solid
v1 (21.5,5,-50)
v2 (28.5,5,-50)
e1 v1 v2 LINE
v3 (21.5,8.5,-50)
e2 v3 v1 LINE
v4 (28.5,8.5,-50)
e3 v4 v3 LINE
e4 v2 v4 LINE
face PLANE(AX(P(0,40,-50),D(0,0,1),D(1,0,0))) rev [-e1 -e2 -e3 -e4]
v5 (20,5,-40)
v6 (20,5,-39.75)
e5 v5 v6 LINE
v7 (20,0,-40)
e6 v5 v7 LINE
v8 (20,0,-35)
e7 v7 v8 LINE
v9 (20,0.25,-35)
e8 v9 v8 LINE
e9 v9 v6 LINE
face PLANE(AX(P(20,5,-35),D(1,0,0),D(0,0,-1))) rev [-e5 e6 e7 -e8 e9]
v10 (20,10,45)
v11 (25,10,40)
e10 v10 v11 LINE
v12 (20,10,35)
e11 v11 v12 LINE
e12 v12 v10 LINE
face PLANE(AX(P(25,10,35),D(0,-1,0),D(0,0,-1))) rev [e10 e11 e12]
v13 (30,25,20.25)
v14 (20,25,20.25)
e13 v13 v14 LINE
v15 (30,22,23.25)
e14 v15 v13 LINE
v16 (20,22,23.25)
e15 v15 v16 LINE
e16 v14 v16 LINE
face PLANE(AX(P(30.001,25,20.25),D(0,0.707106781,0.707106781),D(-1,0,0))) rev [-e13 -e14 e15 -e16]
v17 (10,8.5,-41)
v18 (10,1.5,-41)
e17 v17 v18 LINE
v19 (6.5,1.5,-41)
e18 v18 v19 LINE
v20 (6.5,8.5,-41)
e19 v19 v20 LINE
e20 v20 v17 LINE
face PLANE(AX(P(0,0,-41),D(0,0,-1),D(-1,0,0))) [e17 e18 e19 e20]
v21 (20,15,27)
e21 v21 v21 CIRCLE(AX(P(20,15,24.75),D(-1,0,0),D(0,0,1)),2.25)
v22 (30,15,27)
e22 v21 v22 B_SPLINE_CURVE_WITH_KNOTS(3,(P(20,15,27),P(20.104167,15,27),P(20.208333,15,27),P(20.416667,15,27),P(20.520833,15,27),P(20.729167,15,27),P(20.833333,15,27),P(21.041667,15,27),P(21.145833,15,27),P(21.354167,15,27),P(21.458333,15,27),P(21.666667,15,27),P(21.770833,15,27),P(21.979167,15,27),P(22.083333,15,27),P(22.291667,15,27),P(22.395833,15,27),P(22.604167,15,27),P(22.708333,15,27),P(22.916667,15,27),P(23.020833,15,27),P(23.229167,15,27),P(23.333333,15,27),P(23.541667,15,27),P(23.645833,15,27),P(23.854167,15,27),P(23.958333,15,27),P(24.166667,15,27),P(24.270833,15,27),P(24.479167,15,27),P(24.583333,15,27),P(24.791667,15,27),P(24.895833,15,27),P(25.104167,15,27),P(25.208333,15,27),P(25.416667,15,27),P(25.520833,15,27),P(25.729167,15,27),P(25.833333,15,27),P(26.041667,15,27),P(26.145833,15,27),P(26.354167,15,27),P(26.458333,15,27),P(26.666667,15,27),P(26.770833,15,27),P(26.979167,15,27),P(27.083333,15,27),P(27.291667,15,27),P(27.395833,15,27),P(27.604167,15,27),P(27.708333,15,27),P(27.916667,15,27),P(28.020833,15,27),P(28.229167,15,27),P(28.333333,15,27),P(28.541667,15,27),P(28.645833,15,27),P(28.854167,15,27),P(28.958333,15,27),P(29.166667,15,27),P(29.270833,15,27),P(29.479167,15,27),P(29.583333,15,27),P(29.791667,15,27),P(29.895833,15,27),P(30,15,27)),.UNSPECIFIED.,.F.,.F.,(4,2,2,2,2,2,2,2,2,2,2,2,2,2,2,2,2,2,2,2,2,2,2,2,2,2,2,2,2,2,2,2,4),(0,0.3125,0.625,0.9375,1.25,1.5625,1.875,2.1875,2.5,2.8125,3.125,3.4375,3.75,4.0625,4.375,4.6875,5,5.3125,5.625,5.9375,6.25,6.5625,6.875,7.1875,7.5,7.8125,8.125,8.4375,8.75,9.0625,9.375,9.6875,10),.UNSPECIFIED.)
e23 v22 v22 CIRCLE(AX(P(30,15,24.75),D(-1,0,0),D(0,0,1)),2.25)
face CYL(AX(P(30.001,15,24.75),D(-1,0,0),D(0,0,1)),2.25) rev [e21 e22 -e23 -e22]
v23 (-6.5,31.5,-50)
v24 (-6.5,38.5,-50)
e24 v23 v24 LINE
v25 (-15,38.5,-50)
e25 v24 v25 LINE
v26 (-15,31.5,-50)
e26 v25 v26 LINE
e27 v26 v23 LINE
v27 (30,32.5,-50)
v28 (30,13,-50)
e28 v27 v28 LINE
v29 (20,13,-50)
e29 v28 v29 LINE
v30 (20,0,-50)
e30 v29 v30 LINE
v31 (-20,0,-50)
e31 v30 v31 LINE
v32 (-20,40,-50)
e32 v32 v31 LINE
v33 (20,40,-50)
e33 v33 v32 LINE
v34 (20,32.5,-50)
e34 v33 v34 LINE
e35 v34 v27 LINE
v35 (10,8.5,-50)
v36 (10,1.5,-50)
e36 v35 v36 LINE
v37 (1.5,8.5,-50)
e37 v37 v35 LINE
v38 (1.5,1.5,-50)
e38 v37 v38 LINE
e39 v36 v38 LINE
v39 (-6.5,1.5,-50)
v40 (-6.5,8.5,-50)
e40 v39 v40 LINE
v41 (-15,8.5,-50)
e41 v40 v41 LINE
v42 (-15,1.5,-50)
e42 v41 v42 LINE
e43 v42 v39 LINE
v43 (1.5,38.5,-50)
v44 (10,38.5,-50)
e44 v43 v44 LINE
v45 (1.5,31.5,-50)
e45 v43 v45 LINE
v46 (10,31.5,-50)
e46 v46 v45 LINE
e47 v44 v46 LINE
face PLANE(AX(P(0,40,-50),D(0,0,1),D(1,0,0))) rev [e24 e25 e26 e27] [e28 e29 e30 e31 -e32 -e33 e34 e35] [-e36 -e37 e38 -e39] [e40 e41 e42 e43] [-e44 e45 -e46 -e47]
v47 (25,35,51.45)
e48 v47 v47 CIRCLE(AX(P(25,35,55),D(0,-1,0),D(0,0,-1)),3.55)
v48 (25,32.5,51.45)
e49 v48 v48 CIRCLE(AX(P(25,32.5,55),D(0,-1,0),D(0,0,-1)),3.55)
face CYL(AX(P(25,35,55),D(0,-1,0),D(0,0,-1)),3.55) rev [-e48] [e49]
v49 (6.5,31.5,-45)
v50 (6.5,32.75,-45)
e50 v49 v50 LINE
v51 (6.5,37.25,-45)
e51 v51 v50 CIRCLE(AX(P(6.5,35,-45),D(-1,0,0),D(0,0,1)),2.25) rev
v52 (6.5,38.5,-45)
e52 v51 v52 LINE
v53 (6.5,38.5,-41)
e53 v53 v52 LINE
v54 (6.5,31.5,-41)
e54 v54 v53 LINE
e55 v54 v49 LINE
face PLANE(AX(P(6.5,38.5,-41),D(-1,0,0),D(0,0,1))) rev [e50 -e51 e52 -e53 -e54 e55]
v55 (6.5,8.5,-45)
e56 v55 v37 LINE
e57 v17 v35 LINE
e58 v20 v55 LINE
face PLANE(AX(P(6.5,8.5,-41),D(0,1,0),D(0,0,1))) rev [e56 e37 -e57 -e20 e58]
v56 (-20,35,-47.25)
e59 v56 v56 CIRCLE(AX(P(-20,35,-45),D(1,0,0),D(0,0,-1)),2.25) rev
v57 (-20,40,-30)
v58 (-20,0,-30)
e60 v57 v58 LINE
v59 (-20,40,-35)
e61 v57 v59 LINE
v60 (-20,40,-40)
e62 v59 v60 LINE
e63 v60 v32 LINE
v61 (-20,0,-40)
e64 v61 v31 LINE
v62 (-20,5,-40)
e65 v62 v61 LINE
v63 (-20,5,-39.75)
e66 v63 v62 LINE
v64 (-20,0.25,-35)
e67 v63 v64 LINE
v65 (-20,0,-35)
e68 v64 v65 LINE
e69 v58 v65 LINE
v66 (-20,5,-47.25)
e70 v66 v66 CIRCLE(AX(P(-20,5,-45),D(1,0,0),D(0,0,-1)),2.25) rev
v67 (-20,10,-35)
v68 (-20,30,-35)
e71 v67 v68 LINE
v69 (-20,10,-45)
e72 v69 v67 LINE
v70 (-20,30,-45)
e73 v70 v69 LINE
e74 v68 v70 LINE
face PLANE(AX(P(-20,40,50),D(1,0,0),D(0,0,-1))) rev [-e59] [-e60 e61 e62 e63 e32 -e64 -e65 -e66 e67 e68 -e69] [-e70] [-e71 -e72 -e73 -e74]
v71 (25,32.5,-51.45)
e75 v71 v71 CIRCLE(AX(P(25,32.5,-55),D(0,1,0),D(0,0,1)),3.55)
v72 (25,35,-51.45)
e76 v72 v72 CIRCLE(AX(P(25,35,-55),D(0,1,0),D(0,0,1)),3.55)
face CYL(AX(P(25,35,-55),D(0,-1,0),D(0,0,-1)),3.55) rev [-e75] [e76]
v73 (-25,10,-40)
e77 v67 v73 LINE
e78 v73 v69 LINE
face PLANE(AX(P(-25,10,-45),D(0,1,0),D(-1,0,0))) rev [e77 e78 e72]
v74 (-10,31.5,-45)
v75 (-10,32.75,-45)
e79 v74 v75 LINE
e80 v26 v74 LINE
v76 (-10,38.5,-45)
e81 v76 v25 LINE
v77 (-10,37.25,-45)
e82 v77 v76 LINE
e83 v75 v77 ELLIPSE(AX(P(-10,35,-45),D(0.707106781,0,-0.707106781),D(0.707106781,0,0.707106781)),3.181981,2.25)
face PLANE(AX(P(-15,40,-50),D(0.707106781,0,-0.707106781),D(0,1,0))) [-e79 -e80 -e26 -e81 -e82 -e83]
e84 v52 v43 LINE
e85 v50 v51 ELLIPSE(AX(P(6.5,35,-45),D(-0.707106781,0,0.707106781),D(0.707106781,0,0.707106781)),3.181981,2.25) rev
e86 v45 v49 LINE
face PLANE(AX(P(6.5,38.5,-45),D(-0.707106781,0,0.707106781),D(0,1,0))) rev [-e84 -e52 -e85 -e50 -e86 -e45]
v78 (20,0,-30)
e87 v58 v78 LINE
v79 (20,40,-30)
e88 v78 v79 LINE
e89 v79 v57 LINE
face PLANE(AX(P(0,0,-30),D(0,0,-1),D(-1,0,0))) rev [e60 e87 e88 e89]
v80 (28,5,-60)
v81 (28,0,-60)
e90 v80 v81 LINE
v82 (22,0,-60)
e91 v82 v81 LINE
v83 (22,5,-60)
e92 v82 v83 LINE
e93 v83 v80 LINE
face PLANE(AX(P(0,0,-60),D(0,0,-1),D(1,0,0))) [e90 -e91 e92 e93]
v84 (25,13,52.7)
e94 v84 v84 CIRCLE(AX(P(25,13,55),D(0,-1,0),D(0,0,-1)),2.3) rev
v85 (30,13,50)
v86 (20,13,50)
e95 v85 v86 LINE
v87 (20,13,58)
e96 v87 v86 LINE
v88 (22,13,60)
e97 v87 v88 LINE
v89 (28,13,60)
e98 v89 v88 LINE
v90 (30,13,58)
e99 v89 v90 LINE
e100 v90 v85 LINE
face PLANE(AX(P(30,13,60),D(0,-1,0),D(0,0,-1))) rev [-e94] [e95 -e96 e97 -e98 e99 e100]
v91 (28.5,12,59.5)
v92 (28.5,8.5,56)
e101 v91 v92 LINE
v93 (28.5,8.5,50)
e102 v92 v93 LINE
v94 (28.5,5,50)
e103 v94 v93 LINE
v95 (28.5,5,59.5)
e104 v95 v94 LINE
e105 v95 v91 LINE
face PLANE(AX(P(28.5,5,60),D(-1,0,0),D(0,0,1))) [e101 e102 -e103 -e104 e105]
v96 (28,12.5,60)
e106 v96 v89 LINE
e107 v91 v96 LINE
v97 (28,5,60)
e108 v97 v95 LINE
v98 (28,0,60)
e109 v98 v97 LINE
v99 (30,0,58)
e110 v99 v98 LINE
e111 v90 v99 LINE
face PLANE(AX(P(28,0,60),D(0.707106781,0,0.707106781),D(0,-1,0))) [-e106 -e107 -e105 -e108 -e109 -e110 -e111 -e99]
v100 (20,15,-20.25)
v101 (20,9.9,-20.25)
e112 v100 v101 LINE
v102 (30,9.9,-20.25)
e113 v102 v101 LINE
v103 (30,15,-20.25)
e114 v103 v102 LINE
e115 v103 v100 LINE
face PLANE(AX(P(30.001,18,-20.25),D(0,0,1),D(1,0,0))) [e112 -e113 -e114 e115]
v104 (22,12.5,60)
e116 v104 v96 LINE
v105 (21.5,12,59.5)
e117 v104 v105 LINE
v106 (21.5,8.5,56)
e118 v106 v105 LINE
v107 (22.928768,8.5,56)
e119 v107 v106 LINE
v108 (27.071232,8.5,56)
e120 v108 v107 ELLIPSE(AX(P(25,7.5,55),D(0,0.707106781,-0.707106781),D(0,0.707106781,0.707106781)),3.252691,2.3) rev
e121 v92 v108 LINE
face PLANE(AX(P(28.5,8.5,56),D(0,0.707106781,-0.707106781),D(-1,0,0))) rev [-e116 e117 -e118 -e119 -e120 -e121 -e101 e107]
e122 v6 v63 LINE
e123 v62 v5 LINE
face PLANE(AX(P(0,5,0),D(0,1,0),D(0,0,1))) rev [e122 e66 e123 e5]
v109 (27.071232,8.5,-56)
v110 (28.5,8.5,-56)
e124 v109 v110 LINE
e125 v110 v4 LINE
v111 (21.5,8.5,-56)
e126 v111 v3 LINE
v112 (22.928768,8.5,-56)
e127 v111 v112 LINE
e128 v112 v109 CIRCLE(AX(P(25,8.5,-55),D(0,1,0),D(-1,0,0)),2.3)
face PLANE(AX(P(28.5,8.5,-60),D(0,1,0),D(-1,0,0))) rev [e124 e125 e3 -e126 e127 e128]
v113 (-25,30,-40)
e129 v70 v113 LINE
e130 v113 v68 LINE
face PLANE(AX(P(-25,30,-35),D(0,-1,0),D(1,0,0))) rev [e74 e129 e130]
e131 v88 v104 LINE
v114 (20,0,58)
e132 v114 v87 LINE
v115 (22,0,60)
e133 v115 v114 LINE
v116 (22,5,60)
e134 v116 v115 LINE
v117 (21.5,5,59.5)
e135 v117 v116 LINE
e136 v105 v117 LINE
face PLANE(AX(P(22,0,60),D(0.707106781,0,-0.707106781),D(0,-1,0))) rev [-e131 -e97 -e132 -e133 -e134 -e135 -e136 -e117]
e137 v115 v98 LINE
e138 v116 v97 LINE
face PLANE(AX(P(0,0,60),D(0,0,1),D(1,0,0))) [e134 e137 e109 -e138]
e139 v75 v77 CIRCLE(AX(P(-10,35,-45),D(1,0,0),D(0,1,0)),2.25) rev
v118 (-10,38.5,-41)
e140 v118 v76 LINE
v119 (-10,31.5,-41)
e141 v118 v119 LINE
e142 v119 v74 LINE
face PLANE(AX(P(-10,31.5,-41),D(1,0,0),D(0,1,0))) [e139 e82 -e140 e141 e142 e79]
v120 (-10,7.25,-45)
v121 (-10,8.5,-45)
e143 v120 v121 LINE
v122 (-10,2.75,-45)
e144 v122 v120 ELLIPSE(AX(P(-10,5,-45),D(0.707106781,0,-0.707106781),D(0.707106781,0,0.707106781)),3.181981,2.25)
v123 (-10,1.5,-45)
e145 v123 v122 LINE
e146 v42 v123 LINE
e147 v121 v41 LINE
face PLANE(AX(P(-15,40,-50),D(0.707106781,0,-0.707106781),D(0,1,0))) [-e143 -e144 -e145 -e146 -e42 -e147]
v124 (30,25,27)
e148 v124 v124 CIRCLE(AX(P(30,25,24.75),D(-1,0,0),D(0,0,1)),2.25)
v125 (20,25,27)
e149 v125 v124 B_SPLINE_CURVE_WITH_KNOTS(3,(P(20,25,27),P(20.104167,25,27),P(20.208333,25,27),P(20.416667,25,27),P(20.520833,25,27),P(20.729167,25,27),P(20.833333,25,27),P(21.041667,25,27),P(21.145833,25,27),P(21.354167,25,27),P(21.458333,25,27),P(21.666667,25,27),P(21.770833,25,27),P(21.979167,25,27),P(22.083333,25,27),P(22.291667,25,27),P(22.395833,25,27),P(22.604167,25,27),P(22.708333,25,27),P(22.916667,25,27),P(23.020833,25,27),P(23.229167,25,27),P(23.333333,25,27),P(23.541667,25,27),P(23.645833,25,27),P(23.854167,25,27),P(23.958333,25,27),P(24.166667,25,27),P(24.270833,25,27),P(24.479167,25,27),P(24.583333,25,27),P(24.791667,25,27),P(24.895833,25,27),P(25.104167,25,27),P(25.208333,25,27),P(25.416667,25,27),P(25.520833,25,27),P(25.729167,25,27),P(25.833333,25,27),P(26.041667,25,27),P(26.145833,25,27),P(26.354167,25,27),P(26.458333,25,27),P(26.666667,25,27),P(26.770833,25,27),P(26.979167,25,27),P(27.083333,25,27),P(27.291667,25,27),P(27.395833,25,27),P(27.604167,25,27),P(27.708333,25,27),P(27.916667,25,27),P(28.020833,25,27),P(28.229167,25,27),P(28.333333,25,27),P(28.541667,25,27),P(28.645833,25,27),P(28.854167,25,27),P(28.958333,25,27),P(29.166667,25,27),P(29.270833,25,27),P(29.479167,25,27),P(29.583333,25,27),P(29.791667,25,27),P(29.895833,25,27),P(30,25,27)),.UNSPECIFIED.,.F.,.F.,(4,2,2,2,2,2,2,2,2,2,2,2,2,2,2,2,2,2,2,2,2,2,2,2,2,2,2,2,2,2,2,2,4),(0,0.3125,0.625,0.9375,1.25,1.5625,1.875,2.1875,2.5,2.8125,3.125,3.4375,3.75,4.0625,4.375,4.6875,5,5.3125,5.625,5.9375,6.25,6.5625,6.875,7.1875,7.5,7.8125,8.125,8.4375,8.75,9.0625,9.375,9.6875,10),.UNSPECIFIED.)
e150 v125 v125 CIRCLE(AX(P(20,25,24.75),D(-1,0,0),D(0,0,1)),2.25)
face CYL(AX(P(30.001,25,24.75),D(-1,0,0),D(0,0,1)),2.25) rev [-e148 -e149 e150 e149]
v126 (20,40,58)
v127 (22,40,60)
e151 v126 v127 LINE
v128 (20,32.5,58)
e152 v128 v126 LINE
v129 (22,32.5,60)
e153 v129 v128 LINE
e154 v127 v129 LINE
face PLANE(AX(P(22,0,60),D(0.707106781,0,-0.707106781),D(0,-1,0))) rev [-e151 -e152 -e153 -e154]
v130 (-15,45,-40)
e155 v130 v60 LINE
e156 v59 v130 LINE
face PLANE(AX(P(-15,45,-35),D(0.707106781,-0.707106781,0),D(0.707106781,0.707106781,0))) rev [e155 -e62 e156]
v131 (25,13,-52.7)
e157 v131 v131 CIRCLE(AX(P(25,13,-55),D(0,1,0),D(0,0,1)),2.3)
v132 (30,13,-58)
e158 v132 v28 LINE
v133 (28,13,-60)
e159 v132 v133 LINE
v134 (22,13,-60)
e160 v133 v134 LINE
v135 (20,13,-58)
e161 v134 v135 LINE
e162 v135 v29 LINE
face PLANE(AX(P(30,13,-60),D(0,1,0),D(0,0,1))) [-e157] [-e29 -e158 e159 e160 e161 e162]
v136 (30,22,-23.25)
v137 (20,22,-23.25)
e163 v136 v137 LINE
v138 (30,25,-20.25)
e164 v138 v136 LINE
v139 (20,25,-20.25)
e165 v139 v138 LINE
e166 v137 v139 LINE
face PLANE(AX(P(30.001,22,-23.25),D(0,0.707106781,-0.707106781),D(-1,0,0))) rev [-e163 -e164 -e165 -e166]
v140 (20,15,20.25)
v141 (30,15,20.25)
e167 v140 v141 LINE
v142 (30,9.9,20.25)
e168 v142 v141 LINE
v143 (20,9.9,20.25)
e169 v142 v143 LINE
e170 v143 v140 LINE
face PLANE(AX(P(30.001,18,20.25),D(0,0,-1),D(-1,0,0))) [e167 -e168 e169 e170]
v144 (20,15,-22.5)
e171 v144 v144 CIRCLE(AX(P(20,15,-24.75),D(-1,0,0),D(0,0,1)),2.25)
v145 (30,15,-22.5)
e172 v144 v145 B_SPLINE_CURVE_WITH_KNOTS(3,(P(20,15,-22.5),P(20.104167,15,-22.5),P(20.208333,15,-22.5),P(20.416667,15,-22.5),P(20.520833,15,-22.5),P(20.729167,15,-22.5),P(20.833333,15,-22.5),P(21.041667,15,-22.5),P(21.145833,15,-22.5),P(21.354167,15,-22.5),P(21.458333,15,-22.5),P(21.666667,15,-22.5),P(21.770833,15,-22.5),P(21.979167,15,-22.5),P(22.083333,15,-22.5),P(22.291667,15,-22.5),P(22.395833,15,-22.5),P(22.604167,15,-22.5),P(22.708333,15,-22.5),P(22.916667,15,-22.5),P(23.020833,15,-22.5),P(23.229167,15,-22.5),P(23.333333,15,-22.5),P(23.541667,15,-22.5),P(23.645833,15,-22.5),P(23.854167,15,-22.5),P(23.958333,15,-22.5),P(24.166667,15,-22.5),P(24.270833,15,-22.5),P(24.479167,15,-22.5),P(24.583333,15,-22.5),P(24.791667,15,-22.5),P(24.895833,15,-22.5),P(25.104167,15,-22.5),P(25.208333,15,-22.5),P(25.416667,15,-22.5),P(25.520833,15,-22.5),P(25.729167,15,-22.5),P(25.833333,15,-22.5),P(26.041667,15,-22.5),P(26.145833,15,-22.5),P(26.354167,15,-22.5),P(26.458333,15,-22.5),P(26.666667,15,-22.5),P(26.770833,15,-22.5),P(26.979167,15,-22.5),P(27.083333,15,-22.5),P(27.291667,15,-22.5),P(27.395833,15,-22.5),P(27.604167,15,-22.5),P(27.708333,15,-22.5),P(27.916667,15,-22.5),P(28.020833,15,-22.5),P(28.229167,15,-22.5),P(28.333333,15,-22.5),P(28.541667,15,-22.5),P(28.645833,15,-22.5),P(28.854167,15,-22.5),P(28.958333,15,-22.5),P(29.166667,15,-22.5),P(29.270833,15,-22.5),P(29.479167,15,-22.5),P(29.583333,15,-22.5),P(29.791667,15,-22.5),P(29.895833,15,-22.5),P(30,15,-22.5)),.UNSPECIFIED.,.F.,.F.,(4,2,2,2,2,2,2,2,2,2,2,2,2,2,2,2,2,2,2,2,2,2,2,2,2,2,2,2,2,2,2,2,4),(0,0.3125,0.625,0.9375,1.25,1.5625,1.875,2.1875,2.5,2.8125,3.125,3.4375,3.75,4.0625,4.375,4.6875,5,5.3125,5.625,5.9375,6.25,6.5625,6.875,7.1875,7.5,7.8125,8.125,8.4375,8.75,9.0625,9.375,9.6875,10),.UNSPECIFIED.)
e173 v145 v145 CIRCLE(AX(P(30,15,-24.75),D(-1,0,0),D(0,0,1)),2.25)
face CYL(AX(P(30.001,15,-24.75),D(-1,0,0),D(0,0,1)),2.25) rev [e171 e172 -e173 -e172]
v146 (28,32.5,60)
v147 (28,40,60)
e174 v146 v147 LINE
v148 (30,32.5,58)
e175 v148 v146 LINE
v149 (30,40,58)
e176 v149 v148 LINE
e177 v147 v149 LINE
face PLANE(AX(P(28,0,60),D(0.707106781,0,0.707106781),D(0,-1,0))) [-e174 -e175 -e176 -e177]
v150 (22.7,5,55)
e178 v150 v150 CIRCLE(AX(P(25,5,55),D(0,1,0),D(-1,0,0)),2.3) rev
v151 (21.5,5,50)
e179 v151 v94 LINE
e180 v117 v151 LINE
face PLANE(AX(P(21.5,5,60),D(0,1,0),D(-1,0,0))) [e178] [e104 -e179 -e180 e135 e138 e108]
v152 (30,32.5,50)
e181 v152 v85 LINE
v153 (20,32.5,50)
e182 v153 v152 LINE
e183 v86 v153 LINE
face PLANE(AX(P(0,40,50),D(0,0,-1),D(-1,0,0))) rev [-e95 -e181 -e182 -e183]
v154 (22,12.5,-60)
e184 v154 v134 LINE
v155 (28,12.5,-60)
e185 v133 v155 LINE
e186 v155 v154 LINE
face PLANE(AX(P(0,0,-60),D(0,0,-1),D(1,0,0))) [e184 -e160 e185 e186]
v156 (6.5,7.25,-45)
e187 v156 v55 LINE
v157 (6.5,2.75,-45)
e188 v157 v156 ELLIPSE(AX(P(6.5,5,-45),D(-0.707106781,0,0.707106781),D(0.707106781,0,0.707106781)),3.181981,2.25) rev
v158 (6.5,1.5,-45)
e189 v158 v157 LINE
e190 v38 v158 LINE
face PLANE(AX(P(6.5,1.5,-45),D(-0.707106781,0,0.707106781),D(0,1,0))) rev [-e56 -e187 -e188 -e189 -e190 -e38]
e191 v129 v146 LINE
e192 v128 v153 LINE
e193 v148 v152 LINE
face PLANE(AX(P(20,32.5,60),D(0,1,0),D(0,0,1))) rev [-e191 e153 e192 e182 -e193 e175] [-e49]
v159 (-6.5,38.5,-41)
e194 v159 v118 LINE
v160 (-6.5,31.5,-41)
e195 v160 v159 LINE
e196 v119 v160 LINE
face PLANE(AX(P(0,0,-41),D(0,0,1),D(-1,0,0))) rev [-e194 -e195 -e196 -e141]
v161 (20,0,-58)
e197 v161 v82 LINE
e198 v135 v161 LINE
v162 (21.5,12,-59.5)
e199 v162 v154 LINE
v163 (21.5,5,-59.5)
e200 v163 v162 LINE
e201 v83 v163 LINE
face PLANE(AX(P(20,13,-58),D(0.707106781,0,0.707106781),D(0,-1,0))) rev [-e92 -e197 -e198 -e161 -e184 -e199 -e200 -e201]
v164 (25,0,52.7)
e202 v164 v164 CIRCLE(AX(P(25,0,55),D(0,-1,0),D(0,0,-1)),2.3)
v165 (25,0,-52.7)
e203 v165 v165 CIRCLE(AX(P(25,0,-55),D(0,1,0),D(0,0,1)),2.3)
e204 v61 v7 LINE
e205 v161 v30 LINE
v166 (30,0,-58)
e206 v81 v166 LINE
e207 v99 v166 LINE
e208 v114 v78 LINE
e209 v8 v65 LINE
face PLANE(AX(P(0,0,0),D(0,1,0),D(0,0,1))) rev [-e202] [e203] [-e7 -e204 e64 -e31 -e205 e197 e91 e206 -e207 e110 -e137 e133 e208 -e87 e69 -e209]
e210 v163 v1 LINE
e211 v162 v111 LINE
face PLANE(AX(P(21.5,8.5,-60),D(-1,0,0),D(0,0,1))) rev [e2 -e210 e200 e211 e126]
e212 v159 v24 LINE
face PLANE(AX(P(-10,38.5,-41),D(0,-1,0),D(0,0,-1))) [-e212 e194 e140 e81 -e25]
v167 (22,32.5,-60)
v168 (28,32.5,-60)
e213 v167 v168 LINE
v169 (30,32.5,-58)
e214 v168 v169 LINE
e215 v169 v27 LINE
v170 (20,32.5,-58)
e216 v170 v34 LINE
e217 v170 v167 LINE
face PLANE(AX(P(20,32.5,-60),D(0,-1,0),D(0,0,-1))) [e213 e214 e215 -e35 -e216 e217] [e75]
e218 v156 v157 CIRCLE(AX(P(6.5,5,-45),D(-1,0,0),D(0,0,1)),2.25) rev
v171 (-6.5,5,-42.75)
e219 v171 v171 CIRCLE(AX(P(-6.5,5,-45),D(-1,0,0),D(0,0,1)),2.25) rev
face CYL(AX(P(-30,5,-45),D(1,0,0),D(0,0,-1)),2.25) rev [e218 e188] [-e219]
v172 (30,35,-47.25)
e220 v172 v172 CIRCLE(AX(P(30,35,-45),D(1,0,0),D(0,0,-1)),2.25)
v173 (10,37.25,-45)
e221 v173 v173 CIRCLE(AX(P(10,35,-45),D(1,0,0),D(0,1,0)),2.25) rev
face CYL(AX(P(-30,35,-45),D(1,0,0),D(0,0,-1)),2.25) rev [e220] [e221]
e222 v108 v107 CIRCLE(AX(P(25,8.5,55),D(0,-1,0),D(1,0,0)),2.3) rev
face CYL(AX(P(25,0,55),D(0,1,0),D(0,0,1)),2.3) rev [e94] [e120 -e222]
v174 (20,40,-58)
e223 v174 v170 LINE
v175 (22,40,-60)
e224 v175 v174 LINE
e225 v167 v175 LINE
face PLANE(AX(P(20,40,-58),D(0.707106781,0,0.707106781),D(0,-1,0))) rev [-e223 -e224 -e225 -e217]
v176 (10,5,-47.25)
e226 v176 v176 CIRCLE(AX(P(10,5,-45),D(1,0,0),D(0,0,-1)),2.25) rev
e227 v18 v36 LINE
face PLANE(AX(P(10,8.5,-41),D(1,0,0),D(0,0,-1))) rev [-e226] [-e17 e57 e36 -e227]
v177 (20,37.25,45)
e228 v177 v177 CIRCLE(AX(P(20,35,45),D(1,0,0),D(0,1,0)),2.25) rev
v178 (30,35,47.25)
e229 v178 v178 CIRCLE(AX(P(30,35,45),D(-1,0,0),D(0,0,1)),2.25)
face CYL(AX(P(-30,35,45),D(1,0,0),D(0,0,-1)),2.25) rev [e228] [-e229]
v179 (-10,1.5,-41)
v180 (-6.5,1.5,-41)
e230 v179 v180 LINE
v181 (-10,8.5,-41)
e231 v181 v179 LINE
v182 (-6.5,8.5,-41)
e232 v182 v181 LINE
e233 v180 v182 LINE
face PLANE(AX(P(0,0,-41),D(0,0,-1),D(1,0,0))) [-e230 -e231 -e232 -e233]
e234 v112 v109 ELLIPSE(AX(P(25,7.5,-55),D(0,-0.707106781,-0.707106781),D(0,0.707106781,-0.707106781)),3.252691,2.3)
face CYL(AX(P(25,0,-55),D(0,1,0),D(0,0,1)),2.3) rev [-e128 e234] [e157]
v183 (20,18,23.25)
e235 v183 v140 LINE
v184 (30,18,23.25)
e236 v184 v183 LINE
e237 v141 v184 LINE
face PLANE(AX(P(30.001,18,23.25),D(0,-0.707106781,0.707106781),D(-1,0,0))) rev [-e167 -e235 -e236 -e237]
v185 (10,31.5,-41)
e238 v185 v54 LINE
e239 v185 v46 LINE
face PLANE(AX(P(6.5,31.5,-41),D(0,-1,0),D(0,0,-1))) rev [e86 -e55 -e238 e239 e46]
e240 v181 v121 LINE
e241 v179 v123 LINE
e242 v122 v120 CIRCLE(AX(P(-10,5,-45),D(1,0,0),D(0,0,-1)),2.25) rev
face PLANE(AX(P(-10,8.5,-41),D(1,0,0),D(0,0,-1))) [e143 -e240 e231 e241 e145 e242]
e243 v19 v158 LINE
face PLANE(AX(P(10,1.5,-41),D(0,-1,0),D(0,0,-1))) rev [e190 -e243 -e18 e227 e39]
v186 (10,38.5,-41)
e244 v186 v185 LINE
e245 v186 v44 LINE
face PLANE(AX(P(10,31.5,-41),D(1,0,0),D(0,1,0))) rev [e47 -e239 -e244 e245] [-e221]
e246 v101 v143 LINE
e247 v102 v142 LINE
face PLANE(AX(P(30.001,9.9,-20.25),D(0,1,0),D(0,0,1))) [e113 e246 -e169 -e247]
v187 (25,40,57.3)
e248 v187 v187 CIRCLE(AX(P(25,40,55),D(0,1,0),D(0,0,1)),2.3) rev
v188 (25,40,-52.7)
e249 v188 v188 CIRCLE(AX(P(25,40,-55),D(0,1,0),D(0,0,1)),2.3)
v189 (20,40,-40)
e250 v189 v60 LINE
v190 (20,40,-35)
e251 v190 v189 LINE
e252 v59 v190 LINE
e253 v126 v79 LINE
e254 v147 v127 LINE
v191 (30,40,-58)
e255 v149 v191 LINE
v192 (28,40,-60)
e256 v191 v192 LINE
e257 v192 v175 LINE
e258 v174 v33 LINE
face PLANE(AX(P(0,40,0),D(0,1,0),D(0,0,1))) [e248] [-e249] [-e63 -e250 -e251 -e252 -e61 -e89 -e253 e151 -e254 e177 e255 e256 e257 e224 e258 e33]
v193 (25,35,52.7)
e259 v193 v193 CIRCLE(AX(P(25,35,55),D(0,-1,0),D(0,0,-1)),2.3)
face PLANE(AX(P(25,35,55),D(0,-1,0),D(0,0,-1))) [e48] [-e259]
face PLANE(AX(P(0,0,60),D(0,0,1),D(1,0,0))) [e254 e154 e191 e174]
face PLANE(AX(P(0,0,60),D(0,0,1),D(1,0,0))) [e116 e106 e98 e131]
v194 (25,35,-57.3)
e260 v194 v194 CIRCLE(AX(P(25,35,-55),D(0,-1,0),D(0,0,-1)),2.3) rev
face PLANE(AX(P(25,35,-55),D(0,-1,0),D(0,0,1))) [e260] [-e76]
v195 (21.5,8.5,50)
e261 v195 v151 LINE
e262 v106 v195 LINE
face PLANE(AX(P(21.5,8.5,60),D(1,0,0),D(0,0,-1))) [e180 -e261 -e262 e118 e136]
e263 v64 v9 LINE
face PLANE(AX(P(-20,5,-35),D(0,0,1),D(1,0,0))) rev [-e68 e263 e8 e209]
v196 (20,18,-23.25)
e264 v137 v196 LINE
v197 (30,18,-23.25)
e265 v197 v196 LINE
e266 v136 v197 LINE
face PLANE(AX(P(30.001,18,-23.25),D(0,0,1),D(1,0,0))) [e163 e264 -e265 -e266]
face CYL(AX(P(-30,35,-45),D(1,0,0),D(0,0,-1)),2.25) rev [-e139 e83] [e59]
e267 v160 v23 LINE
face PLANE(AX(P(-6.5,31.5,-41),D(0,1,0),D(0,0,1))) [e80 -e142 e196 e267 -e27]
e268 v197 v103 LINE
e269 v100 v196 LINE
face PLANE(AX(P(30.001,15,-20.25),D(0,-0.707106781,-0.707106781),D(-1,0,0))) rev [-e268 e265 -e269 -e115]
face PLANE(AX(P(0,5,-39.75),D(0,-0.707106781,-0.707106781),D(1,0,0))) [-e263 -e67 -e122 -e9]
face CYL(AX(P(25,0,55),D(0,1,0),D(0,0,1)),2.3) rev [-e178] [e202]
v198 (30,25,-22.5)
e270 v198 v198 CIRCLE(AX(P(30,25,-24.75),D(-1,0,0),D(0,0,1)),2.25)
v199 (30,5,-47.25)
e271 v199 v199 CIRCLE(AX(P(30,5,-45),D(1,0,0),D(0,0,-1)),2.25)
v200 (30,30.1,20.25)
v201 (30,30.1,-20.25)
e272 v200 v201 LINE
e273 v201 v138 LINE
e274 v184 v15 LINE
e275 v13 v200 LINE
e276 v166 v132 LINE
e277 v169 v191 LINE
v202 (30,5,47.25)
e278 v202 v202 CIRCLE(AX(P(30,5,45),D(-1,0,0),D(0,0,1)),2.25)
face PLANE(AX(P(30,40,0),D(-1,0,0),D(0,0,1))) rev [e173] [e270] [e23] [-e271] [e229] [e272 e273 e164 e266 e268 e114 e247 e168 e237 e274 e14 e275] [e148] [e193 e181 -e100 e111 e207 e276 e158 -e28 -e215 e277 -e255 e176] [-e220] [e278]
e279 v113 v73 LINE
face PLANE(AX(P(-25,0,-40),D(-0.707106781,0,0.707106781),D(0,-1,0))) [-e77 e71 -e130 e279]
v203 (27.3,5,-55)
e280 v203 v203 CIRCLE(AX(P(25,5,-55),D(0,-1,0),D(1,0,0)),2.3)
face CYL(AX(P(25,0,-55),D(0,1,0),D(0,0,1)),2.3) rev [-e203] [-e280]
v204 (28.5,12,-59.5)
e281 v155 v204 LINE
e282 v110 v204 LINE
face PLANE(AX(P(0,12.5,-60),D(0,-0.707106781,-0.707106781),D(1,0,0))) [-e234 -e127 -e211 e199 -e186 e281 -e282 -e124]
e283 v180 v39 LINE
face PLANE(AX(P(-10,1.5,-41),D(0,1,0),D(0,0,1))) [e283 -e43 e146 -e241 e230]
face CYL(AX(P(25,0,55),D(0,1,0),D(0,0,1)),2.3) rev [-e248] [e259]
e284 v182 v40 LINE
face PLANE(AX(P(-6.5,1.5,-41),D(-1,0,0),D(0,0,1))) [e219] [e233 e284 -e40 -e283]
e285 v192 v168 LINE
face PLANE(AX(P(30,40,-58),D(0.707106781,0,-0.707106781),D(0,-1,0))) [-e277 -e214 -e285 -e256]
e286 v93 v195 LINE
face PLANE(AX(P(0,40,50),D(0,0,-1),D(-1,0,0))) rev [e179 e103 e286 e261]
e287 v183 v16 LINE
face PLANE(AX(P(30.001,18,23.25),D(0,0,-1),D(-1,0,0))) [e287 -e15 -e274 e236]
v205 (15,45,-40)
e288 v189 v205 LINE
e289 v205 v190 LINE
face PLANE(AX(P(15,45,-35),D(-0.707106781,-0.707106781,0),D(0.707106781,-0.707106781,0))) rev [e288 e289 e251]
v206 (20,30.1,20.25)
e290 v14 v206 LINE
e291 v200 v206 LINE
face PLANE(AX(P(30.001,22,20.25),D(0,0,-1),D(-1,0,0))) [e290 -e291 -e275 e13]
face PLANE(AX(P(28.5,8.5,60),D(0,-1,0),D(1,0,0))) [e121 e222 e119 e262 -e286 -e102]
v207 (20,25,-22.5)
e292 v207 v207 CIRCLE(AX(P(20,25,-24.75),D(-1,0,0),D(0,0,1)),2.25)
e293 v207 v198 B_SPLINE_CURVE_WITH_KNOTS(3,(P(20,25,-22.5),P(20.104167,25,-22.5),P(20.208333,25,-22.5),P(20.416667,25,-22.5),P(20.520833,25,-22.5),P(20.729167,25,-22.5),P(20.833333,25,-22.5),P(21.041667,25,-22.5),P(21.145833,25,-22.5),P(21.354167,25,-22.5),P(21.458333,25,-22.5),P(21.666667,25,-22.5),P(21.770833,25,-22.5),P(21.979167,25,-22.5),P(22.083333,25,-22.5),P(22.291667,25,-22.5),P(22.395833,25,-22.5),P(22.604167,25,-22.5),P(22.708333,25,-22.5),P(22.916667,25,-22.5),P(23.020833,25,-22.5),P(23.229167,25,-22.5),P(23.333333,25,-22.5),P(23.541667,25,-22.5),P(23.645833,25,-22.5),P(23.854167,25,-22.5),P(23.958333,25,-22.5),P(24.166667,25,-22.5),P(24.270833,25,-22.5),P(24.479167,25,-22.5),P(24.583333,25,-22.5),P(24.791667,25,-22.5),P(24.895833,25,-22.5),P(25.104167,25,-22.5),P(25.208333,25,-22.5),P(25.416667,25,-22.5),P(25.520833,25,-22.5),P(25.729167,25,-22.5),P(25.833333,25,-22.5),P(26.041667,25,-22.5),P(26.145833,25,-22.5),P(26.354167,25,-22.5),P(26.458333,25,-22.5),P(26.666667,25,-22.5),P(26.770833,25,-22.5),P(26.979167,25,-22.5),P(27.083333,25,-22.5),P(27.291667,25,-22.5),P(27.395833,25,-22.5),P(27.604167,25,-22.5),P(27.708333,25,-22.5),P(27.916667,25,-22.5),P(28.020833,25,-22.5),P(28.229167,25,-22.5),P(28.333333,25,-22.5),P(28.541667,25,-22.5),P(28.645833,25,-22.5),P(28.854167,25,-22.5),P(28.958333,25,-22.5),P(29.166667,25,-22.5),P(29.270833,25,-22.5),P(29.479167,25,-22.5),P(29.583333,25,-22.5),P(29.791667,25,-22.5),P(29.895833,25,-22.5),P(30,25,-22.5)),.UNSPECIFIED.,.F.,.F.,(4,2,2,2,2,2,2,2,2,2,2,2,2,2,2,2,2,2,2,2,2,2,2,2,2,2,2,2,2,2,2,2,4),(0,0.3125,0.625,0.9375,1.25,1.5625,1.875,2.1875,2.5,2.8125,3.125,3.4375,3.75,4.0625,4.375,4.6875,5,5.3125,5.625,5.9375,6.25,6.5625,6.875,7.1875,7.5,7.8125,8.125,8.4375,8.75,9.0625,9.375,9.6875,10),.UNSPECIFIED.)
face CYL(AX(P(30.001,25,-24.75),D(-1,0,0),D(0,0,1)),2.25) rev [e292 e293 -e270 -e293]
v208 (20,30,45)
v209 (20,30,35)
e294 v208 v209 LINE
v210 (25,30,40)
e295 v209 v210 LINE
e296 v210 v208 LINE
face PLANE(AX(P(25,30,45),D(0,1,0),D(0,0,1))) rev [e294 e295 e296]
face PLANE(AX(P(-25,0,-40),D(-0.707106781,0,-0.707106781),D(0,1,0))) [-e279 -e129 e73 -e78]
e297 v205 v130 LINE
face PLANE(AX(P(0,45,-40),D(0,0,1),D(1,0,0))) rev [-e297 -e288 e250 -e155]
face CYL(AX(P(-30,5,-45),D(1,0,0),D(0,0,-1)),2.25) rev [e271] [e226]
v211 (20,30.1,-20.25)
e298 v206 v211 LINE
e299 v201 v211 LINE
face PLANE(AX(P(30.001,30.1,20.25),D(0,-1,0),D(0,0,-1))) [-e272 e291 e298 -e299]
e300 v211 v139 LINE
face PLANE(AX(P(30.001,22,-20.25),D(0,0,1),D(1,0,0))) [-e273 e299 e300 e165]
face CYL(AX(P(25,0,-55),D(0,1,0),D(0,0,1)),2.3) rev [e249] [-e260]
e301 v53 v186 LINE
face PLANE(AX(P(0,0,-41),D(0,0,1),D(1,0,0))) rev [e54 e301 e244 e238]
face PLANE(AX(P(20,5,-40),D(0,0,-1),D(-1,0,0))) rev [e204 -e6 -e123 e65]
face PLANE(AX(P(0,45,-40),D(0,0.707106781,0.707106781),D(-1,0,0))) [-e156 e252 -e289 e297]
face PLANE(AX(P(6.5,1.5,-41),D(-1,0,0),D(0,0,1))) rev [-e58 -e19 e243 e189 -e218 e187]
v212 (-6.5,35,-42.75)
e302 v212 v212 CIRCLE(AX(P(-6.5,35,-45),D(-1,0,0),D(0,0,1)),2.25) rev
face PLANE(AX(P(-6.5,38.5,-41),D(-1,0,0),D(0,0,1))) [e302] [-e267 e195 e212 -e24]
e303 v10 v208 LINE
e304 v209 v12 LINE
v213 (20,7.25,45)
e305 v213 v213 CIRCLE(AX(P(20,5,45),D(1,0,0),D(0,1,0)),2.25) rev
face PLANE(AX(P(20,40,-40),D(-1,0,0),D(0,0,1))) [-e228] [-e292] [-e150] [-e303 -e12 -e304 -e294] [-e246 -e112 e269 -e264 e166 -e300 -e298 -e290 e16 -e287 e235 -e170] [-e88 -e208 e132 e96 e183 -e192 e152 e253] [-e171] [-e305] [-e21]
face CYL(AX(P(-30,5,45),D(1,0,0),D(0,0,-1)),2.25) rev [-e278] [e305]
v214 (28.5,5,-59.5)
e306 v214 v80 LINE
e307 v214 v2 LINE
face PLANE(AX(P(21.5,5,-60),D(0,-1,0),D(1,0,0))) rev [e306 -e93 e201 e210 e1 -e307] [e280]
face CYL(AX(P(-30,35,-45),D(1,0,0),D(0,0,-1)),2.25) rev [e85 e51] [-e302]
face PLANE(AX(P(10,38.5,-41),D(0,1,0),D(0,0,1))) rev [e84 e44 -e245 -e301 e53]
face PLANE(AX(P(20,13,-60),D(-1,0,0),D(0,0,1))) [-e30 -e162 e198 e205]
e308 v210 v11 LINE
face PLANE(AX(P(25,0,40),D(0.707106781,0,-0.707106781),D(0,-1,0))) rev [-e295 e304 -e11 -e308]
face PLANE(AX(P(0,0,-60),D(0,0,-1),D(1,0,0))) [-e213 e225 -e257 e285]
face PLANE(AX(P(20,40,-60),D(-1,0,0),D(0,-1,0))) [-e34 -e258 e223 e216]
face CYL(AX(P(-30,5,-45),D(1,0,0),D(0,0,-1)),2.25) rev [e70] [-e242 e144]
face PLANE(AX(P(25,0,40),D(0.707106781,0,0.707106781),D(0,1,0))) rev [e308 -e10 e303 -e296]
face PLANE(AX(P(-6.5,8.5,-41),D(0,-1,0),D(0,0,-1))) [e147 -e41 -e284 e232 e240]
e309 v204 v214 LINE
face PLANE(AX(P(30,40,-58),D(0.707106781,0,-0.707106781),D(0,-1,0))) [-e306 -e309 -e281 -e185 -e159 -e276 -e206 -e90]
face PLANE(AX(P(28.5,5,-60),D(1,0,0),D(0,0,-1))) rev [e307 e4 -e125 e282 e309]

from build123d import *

# Parameters (mm, degrees)
SKETCH1_W                      = 60
SKETCH1_H                      = 100
SKETCH1_W_2                    = 40
SKETCH1_H_2                    = 80
EXTRUDE_THIN1_DEPTH            = 40
CUT_EXTRUDE1_REACH             = 72.711
SKETCH2_R                      = 2.25
CUT_EXTRUDE1_DIRECTION_2_REACH = 72.711
SKETCH3_W                      = 40
SKETCH3_H                      = 40
BOSS_EXTRUDE1_DEPTH            = 10
CUT_EXTRUDE2_START             = -30
SKETCH4_R                      = 2.25
CUT_EXTRUDE2_DEPTH             = 60
SKETCH5_W                      = 10
SKETCH5_H                      = 40
CUT_EXTRUDE3_DEPTH             = 112.803398875
CUT_EXTRUDE4_REACH             = 113.803
SKETCH6_W                      = 40
SKETCH6_H                      = 40
SKETCH7_W                      = 10
SKETCH7_H                      = 20
BOSS_EXTRUDE2_DEPTH            = 5
CHAMFER1_SIZE                  = 5
SKETCH8_W                      = 10
SKETCH8_H                      = 20
CUT_EXTRUDE5_DEPTH             = 5
CHAMFER2_SIZE                  = 5
SKETCH9_W                      = 3.5
SKETCH9_H                      = 7
CUT_EXTRUDE6_DEPTH             = 9
CHAMFER3_SIZE                  = 5
SKETCH10_W                     = 10
SKETCH10_H                     = 7.5
SKETCH10_H_2                   = 13
SKETCH10_W_2                   = 7
SKETCH10_H_3                   = 3.5
BOSS_EXTRUDE3_DEPTH            = 10
CUT_EXTRUDE7_REACH             = 76.54
SKETCH11_R                     = 2.3
CUT_EXTRUDE7_DIRECTION_2_DEPTH = 75.540257579
CHAMFER4_SIZE                  = 4
SKETCH12_R                     = 3.55
CUT_EXTRUDE8_DEPTH             = 2.5
CHAMFER5_SIZE                  = 2
SKETCH13_W                     = 40
SKETCH13_H                     = 5
CUT_EXTRUDE9_DEPTH             = 5
BOSS_EXTRUDE4_START            = -45
SKETCH13_2_W                   = 40
SKETCH13_2_H                   = 5
BOSS_EXTRUDE4_DEPTH            = 5
CHAMFER6_SIZE                  = 4.75
CHAMFER7_SIZE                  = 5
CUT_EXTRUDE10_DEPTH            = 5
CHAMFER8_SIZE                  = 3


# Some blends are built 0.0001 mm under size
with BuildPart() as part:
    # Sketch1 → Extrude-Thin1 (new body)
    with BuildSketch(Plane(origin=(0, 0, 0), x_dir=(1, 0, 0), z_dir=(0, 1, 0))):
        Rectangle(SKETCH1_W, SKETCH1_H)
        Rectangle(SKETCH1_W_2, SKETCH1_H_2, mode=Mode.SUBTRACT)
    extrude(amount=EXTRUDE_THIN1_DEPTH)

    # Sketch2 → Cut-Extrude1 (cut, up to next)
    with BuildSketch(Plane(origin=(0, 0, 0), x_dir=(0, 0, -1), z_dir=(1, 0, 0)), mode=Mode.PRIVATE) as cut_extrude1_sk1:
        with Locations(Location((-24.75, 15, 0), (0, 0, 180))):
            Circle(SKETCH2_R)
    cut_extrude1_tool1 = extrude(cut_extrude1_sk1.sketch, amount=-CUT_EXTRUDE1_REACH, mode=Mode.PRIVATE) & part.part
    # Sketch2 → Cut-Extrude1 (cut, up to next)
    with BuildSketch(Plane(origin=(0, 0, 0), x_dir=(0, 0, -1), z_dir=(1, 0, 0)), mode=Mode.PRIVATE) as cut_extrude1_sk2:
        with Locations(Location((-24.75, 25, 0), (0, 0, 180))):
            Circle(SKETCH2_R)
    cut_extrude1_tool2 = extrude(cut_extrude1_sk2.sketch, amount=-CUT_EXTRUDE1_REACH, mode=Mode.PRIVATE) & part.part
    # Sketch2 → Cut-Extrude1 (cut, up to next)
    with BuildSketch(Plane(origin=(0, 0, 0), x_dir=(0, 0, -1), z_dir=(1, 0, 0)), mode=Mode.PRIVATE) as cut_extrude1_sk3:
        with Locations(Location((24.75, 25, 0), (0, 0, 180))):
            Circle(SKETCH2_R)
    cut_extrude1_tool3 = extrude(cut_extrude1_sk3.sketch, amount=-CUT_EXTRUDE1_REACH, mode=Mode.PRIVATE) & part.part
    # Sketch2 → Cut-Extrude1 (cut, up to next)
    with BuildSketch(Plane(origin=(0, 0, 0), x_dir=(0, 0, -1), z_dir=(1, 0, 0)), mode=Mode.PRIVATE) as cut_extrude1_sk4:
        with Locations(Location((24.75, 15, 0), (0, 0, 180))):
            Circle(SKETCH2_R)
    cut_extrude1_tool4 = extrude(cut_extrude1_sk4.sketch, amount=-CUT_EXTRUDE1_REACH, mode=Mode.PRIVATE) & part.part
    # Sketch2 → Cut-Extrude1 (cut, up to next)
    with BuildSketch(Plane(origin=(0, 0, 0), x_dir=(0, 0, -1), z_dir=(1, 0, 0)), mode=Mode.PRIVATE) as cut_extrude1_sk5:
        Polygon((-20.25, 30.1), (20.25, 30.1), (20.25, 22), (23.25, 22), (23.25, 18), (20.25, 18), (20.25, 9.9), (-20.25, 9.9), (-20.25, 18), (-23.25, 18), (-23.25, 22), (-20.25, 22), align=None)
    cut_extrude1_tool5 = extrude(cut_extrude1_sk5.sketch, amount=-CUT_EXTRUDE1_REACH, mode=Mode.PRIVATE) & part.part
    add(cut_extrude1_tool1.solids().sort_by_distance((0, 15, 24.75))[0], mode=Mode.SUBTRACT)
    add(cut_extrude1_tool2.solids().sort_by_distance((0, 25, 24.75))[0], mode=Mode.SUBTRACT)
    add(cut_extrude1_tool3.solids().sort_by_distance((0, 25, -24.75))[0], mode=Mode.SUBTRACT)
    add(cut_extrude1_tool4.solids().sort_by_distance((0, 15, -24.75))[0], mode=Mode.SUBTRACT)
    add(cut_extrude1_tool5.solids().sort_by_distance((0, 20, 0))[0], mode=Mode.SUBTRACT)

    # Sketch2 → Cut-Extrude1 direction 2 (cut, up to next)
    with BuildSketch(Plane(origin=(0, 0, 0), x_dir=(0, 0, -1), z_dir=(1, 0, 0)), mode=Mode.PRIVATE) as cut_extrude1_direction_2_sk1:
        with Locations(Location((-24.75, 15, 0), (0, 0, 180))):
            Circle(SKETCH2_R)
    cut_extrude1_direction_2_tool1 = extrude(cut_extrude1_direction_2_sk1.sketch, amount=CUT_EXTRUDE1_DIRECTION_2_REACH, mode=Mode.PRIVATE) & part.part
    # Sketch2 → Cut-Extrude1 direction 2 (cut, up to next)
    with BuildSketch(Plane(origin=(0, 0, 0), x_dir=(0, 0, -1), z_dir=(1, 0, 0)), mode=Mode.PRIVATE) as cut_extrude1_direction_2_sk2:
        with Locations(Location((-24.75, 25, 0), (0, 0, 180))):
            Circle(SKETCH2_R)
    cut_extrude1_direction_2_tool2 = extrude(cut_extrude1_direction_2_sk2.sketch, amount=CUT_EXTRUDE1_DIRECTION_2_REACH, mode=Mode.PRIVATE) & part.part
    # Sketch2 → Cut-Extrude1 direction 2 (cut, up to next)
    with BuildSketch(Plane(origin=(0, 0, 0), x_dir=(0, 0, -1), z_dir=(1, 0, 0)), mode=Mode.PRIVATE) as cut_extrude1_direction_2_sk3:
        with Locations(Location((24.75, 25, 0), (0, 0, 180))):
            Circle(SKETCH2_R)
    cut_extrude1_direction_2_tool3 = extrude(cut_extrude1_direction_2_sk3.sketch, amount=CUT_EXTRUDE1_DIRECTION_2_REACH, mode=Mode.PRIVATE) & part.part
    # Sketch2 → Cut-Extrude1 direction 2 (cut, up to next)
    with BuildSketch(Plane(origin=(0, 0, 0), x_dir=(0, 0, -1), z_dir=(1, 0, 0)), mode=Mode.PRIVATE) as cut_extrude1_direction_2_sk4:
        with Locations(Location((24.75, 15, 0), (0, 0, 180))):
            Circle(SKETCH2_R)
    cut_extrude1_direction_2_tool4 = extrude(cut_extrude1_direction_2_sk4.sketch, amount=CUT_EXTRUDE1_DIRECTION_2_REACH, mode=Mode.PRIVATE) & part.part
    # Sketch2 → Cut-Extrude1 direction 2 (cut, up to next)
    with BuildSketch(Plane(origin=(0, 0, 0), x_dir=(0, 0, -1), z_dir=(1, 0, 0)), mode=Mode.PRIVATE) as cut_extrude1_direction_2_sk5:
        Polygon((-20.25, 30.1), (20.25, 30.1), (20.25, 22), (23.25, 22), (23.25, 18), (20.25, 18), (20.25, 9.9), (-20.25, 9.9), (-20.25, 18), (-23.25, 18), (-23.25, 22), (-20.25, 22), align=None)
    cut_extrude1_direction_2_tool5 = extrude(cut_extrude1_direction_2_sk5.sketch, amount=CUT_EXTRUDE1_DIRECTION_2_REACH, mode=Mode.PRIVATE) & part.part
    add(cut_extrude1_direction_2_tool1.solids().sort_by_distance((0, 15, 24.75))[0], mode=Mode.SUBTRACT)
    add(cut_extrude1_direction_2_tool2.solids().sort_by_distance((0, 25, 24.75))[0], mode=Mode.SUBTRACT)
    add(cut_extrude1_direction_2_tool3.solids().sort_by_distance((0, 25, -24.75))[0], mode=Mode.SUBTRACT)
    add(cut_extrude1_direction_2_tool4.solids().sort_by_distance((0, 15, -24.75))[0], mode=Mode.SUBTRACT)
    add(cut_extrude1_direction_2_tool5.solids().sort_by_distance((0, 20, 0))[0], mode=Mode.SUBTRACT)

    # Sketch3 → Boss-Extrude1 (add)
    with BuildSketch(Plane.XY.offset(-40)):
        with Locations((0, 20)):
            Rectangle(SKETCH3_W, SKETCH3_H)
    boss_extrude1 = extrude(amount=BOSS_EXTRUDE1_DEPTH)

    # Mirror1: Boss-Extrude1 across plane
    add(boss_extrude1.mirror(Plane.XY))

    # Sketch4 → Cut-Extrude2 (cut)
    with BuildSketch(Plane(origin=(0, 0, 0), x_dir=(0, 0, -1), z_dir=(1, 0, 0)).offset(CUT_EXTRUDE2_START)):
        with Locations((45, 5)):
            Circle(SKETCH4_R)
        with Locations((45, 35)):
            Circle(SKETCH4_R)
    cut_extrude2 = extrude(amount=CUT_EXTRUDE2_DEPTH, mode=Mode.SUBTRACT)

    # Mirror2: Cut-Extrude2 across plane
    add(cut_extrude2.mirror(Plane.XY), mode=Mode.SUBTRACT)

    # Sketch5 → Cut-Extrude3 (cut, through all)
    with BuildSketch(Plane(origin=(0, 0, -50), x_dir=(-1, 0, 0), z_dir=(0, 0, -1))):
        with Locations((25, 20)):
            Rectangle(SKETCH5_W, SKETCH5_H)
    extrude(amount=-CUT_EXTRUDE3_DEPTH, mode=Mode.SUBTRACT)

    # Sketch6 → Cut-Extrude4 (cut, up to next)
    with BuildSketch(Plane.XY.offset(50), mode=Mode.PRIVATE) as cut_extrude4_sk1:
        with Locations((0, 20)):
            Rectangle(SKETCH6_W, SKETCH6_H)
    cut_extrude4_tool1 = extrude(cut_extrude4_sk1.sketch, amount=-CUT_EXTRUDE4_REACH, mode=Mode.PRIVATE) & part.part
    add(cut_extrude4_tool1.solids().sort_by_distance((0, 20, 50))[0], mode=Mode.SUBTRACT)

    # Sketch7 → Boss-Extrude2 (add)
    with BuildSketch(Plane.ZY.offset(20)):
        with Locations((-40, 20)):
            Rectangle(SKETCH7_W, SKETCH7_H)
    extrude(amount=BOSS_EXTRUDE2_DEPTH)

    # Chamfer1
    chamfer1_edges = [part.edges().sort_by_distance(p)[0] for p in [
        (-25, 20, -35),
        (-25, 20, -45),
    ]]
    chamfer(chamfer1_edges, length=CHAMFER1_SIZE - 0.0001)  # a hair under: the kernel refuses the full size

    # Sketch8 → Cut-Extrude5 (cut)
    with BuildSketch(Plane.ZY.offset(-20)):
        with Locations((40, 20)):
            Rectangle(SKETCH8_W, SKETCH8_H)
    extrude(amount=-CUT_EXTRUDE5_DEPTH, mode=Mode.SUBTRACT)

    # Chamfer2
    chamfer2_edges = [part.edges().sort_by_distance(p)[0] for p in [
        (25, 20, 45),
        (25, 20, 35),
    ]]
    chamfer(chamfer2_edges, length=CHAMFER2_SIZE - 0.0001)  # a hair under: the kernel refuses the full size

    # Sketch9 → Cut-Extrude6 (cut)
    with BuildSketch(Plane(origin=(0, 0, -50), x_dir=(-1, 0, 0), z_dir=(0, 0, -1))):
        with Locations((-8.25, 35)):
            Rectangle(SKETCH9_W, SKETCH9_H)
        with Locations((-8.25, 5)):
            Rectangle(SKETCH9_W, SKETCH9_H)
    cut_extrude6 = extrude(amount=-CUT_EXTRUDE6_DEPTH, mode=Mode.SUBTRACT)

    # Mirror3: Cut-Extrude6 across plane
    add(cut_extrude6.mirror(Plane(origin=(0, 0, 0), x_dir=(0, 0, 1), z_dir=(1, 0, 0))), mode=Mode.SUBTRACT)

    # Chamfer3
    # the kernel refuses this chamfer: 5 mm, written as the material it takes off along each edge
    with BuildSketch(Plane(origin=(6.5, 38.5, -50), x_dir=(-0.9996219169112968, 0, -0.027495876610586317), z_dir=(0, -1, 0)), Plane(origin=(-10, 8.5, -50), x_dir=(-0.9996219169112968, 0, -0.02749587661058493), z_dir=(0, -1, 0))) as chamfer3_piece_1:
        Polygon((CHAMFER3_SIZE * 0.999621916911, -CHAMFER3_SIZE * 0.0274958766106), (-CHAMFER3_SIZE * 0.0274958766106, -CHAMFER3_SIZE * 0.999621916911), (0, 0), align=None)
    extrude(amount=7, mode=Mode.SUBTRACT)
    with BuildSketch(Plane(origin=(6.5, 1.5, -50), x_dir=(-0.9996219169112968, 0, -0.027495876610586313), z_dir=(0, 1, 0)), Plane(origin=(-10, 31.5, -50), x_dir=(-0.9996219169112968, 0, -0.02749587661058493), z_dir=(0, 1, 0))) as chamfer3_piece_2:
        Polygon((CHAMFER3_SIZE * 0.999621916911, CHAMFER3_SIZE * 0.0274958766106), (-CHAMFER3_SIZE * 0.0274958766106, CHAMFER3_SIZE * 0.999621916911), (0, 0), align=None)
    extrude(amount=7, mode=Mode.SUBTRACT)

    # Sketch10 → Boss-Extrude3 (add)
    # profile 1 of 2: a face of its own
    with BuildSketch(Plane.XY.offset(50)):
        with Locations((25, 36.25)):
            Rectangle(SKETCH10_W, SKETCH10_H)
    # profile 2 of 2: a face of its own
    with BuildSketch(Plane.XY.offset(50)):
        with Locations((25, 6.5)):
            Rectangle(SKETCH10_W, SKETCH10_H_2)
        with Locations((25, 6.75)):
            Rectangle(SKETCH10_W_2, SKETCH10_H_3, mode=Mode.SUBTRACT)
    boss_extrude3 = extrude(amount=BOSS_EXTRUDE3_DEPTH)

    # Sketch11 → Cut-Extrude7 (cut, up to next)
    with BuildSketch(Plane(origin=(0, 32.5, 0), x_dir=(-1, 0, 0), z_dir=(0, -1, 0)), mode=Mode.PRIVATE) as cut_extrude7_sk1:
        with Locations((-25, -55)):
            Circle(SKETCH11_R)
    cut_extrude7_tool1 = extrude(cut_extrude7_sk1.sketch, amount=-CUT_EXTRUDE7_REACH, mode=Mode.PRIVATE) & part.part
    cut_extrude7 = cut_extrude7_tool1.solids().sort_by_distance((25, 32.5, 55))[0]
    add(cut_extrude7, mode=Mode.SUBTRACT)

    # Sketch11 → Cut-Extrude7 direction 2 (cut)
    with BuildSketch(Plane(origin=(0, 32.5, 0), x_dir=(-1, 0, 0), z_dir=(0, -1, 0))):
        with Locations((-25, -55)):
            Circle(SKETCH11_R)
    cut_extrude7_direction_2 = extrude(amount=CUT_EXTRUDE7_DIRECTION_2_DEPTH, mode=Mode.SUBTRACT)

    # Mirror4: Boss-Extrude3 across plane
    add(boss_extrude3.mirror(Plane.XY))

    # Mirror5: Cut-Extrude7, Cut-Extrude7 direction 2 across plane
    add(cut_extrude7.mirror(Plane.XY), mode=Mode.SUBTRACT)
    add(cut_extrude7_direction_2.mirror(Plane.XY), mode=Mode.SUBTRACT)

    # Chamfer4
    # the kernel refuses this chamfer: 4 mm, written as the material it takes off along each edge
    with BuildSketch(Plane(origin=(28.5, 8.5, 60), x_dir=(0, 0.9996219169112968, 0.027495876610585623), z_dir=(-1, 0, 0))) as chamfer4_piece_1:
        Polygon((CHAMFER4_SIZE * 0.999621916911, CHAMFER4_SIZE * 0.0274958766106), (-CHAMFER4_SIZE * 0.0274958766106, CHAMFER4_SIZE * 0.999621916911), (0, 0), align=None)
    extrude(amount=7, mode=Mode.SUBTRACT)
    with BuildSketch(Plane(origin=(28.5, 8.5, -60), x_dir=(0, 0.9996219169112968, -0.027495876610585623), z_dir=(-1, 0, 0))) as chamfer4_piece_2:
        Polygon((CHAMFER4_SIZE * 0.999621916911, -CHAMFER4_SIZE * 0.0274958766106), (-CHAMFER4_SIZE * 0.0274958766106, -CHAMFER4_SIZE * 0.999621916911), (0, 0), align=None)
    extrude(amount=7, mode=Mode.SUBTRACT)

    # Sketch12 → Cut-Extrude8 (cut)
    with BuildSketch(Plane(origin=(0, 32.5, 0), x_dir=(-1, 0, 0), z_dir=(0, -1, 0))):
        with Locations(Location((-25, -55, 0), (0, 0, 90))):
            Circle(SKETCH12_R)
    cut_extrude8 = extrude(amount=-CUT_EXTRUDE8_DEPTH, mode=Mode.SUBTRACT)

    # Mirror6: Cut-Extrude8 across Front Plane
    add(cut_extrude8.mirror(Plane.XY), mode=Mode.SUBTRACT)

    # Chamfer5
    # the kernel refuses this chamfer: 2 mm, written as the material it takes off along each edge
    with BuildSketch(Plane(origin=(20, 45.143365976, 60), x_dir=(-0.027495876610585647, 0, -0.9996219169112968), z_dir=(0, -1, 0)), Plane(origin=(20, 45.143365976, -60), x_dir=(0.9996219169112968, -3.3146124273169054e-15, -0.027495876610585647), z_dir=(0, -1, 0))) as chamfer5_piece_1:
        Polygon((CHAMFER5_SIZE * 0.999621916911, CHAMFER5_SIZE * 0.0274958766106), (-CHAMFER5_SIZE * 0.0274958766106, CHAMFER5_SIZE * 0.999621916911), (0, 0), align=None)
    extrude(amount=17.786731952, mode=Mode.SUBTRACT)
    with BuildSketch(Plane(origin=(30, 27.356634024, 60), x_dir=(-0.9996219169112968, 0, 0.027495876610585647), z_dir=(0, 1, 0)), Plane(origin=(30, 27.356634024, -60), x_dir=(0.027495876610585647, 0, 0.9996219169112968), z_dir=(0, 1, 0))) as chamfer5_piece_2:
        Polygon((CHAMFER5_SIZE * 0.999621916911, -CHAMFER5_SIZE * 0.0274958766106), (-CHAMFER5_SIZE * 0.0274958766106, -CHAMFER5_SIZE * 0.999621916911), (0, 0), align=None)
    extrude(amount=17.786731952, mode=Mode.SUBTRACT)
    with BuildSketch(Plane(origin=(20, 18.143365976, 60), x_dir=(-0.027495876610585647, 0, -0.9996219169112968), z_dir=(0, -1, 0)), Plane(origin=(20, 18.143365976, -60), x_dir=(0.9996219169112968, 0, -0.027495876610585647), z_dir=(0, -1, 0))) as chamfer5_piece_3:
        Polygon((CHAMFER5_SIZE * 0.999621916911, CHAMFER5_SIZE * 0.0274958766106), (-CHAMFER5_SIZE * 0.0274958766106, CHAMFER5_SIZE * 0.999621916911), (0, 0), align=None)
    extrude(amount=23.286731952, mode=Mode.SUBTRACT)
    with BuildSketch(Plane(origin=(30, -5.143365976, 60), x_dir=(-0.9996219169112968, 0, 0.027495876610585647), z_dir=(0, 1, 0)), Plane(origin=(30, -5.143365976, -60), x_dir=(0.027495876610585647, 0, 0.9996219169112968), z_dir=(0, 1, 0))) as chamfer5_piece_4:
        Polygon((CHAMFER5_SIZE * 0.999621916911, -CHAMFER5_SIZE * 0.0274958766106), (-CHAMFER5_SIZE * 0.0274958766106, -CHAMFER5_SIZE * 0.999621916911), (0, 0), align=None)
    extrude(amount=23.286731952, mode=Mode.SUBTRACT)

    # Sketch13 → Cut-Extrude9 (cut)
    with BuildSketch(Plane(origin=(0, 0, 0), x_dir=(-1, 0, 0), z_dir=(0, -1, 0))):
        with Locations((0, 37.5)):
            Rectangle(SKETCH13_W, SKETCH13_H)
    extrude(amount=-CUT_EXTRUDE9_DEPTH, mode=Mode.SUBTRACT)

    # Sketch13<2> → Boss-Extrude4 (add)
    with BuildSketch(Plane(origin=(0, 0, 0), x_dir=(-1, 0, 0), z_dir=(0, -1, 0)).offset(BOSS_EXTRUDE4_START)):
        with Locations((0, 37.5)):
            Rectangle(SKETCH13_2_W, SKETCH13_2_H)
    extrude(amount=BOSS_EXTRUDE4_DEPTH)

    # Chamfer6
    chamfer6_edges = [part.edges().sort_by_distance(p)[0] for p in [
        (0, 5, -35),
    ]]
    chamfer(chamfer6_edges, length=CHAMFER6_SIZE)

    # Chamfer7
    chamfer7_edges = [part.edges().sort_by_distance(p)[0] for p in [
        (0, 45, -35),
    ]]
    chamfer(chamfer7_edges, length=CHAMFER7_SIZE - 0.0001)  # a hair under: the kernel refuses the full size

    # Sketch14 → Cut-Extrude10 (cut)
    with BuildSketch(Plane(origin=(0, 0, -40), x_dir=(-1, 0, 0), z_dir=(0, 0, -1))):
        Polygon((-20, 45), (-15, 45), (-20, 40), align=None)
        Polygon((20, 45), (15, 45), (20, 40), align=None)
    extrude(amount=-CUT_EXTRUDE10_DEPTH, mode=Mode.SUBTRACT)

    # Chamfer8
    chamfer8_edges = [part.edges().sort_by_distance(p)[0] for p in [
        (25, 18, -20.25),
        (25, 22, -20.25),
        (25, 18, 20.25),
        (25, 22, 20.25),
    ]]
    chamfer(chamfer8_edges, length=CHAMFER8_SIZE - 0.0001)  # a hair under: the kernel refuses the full size


solid = part.part
